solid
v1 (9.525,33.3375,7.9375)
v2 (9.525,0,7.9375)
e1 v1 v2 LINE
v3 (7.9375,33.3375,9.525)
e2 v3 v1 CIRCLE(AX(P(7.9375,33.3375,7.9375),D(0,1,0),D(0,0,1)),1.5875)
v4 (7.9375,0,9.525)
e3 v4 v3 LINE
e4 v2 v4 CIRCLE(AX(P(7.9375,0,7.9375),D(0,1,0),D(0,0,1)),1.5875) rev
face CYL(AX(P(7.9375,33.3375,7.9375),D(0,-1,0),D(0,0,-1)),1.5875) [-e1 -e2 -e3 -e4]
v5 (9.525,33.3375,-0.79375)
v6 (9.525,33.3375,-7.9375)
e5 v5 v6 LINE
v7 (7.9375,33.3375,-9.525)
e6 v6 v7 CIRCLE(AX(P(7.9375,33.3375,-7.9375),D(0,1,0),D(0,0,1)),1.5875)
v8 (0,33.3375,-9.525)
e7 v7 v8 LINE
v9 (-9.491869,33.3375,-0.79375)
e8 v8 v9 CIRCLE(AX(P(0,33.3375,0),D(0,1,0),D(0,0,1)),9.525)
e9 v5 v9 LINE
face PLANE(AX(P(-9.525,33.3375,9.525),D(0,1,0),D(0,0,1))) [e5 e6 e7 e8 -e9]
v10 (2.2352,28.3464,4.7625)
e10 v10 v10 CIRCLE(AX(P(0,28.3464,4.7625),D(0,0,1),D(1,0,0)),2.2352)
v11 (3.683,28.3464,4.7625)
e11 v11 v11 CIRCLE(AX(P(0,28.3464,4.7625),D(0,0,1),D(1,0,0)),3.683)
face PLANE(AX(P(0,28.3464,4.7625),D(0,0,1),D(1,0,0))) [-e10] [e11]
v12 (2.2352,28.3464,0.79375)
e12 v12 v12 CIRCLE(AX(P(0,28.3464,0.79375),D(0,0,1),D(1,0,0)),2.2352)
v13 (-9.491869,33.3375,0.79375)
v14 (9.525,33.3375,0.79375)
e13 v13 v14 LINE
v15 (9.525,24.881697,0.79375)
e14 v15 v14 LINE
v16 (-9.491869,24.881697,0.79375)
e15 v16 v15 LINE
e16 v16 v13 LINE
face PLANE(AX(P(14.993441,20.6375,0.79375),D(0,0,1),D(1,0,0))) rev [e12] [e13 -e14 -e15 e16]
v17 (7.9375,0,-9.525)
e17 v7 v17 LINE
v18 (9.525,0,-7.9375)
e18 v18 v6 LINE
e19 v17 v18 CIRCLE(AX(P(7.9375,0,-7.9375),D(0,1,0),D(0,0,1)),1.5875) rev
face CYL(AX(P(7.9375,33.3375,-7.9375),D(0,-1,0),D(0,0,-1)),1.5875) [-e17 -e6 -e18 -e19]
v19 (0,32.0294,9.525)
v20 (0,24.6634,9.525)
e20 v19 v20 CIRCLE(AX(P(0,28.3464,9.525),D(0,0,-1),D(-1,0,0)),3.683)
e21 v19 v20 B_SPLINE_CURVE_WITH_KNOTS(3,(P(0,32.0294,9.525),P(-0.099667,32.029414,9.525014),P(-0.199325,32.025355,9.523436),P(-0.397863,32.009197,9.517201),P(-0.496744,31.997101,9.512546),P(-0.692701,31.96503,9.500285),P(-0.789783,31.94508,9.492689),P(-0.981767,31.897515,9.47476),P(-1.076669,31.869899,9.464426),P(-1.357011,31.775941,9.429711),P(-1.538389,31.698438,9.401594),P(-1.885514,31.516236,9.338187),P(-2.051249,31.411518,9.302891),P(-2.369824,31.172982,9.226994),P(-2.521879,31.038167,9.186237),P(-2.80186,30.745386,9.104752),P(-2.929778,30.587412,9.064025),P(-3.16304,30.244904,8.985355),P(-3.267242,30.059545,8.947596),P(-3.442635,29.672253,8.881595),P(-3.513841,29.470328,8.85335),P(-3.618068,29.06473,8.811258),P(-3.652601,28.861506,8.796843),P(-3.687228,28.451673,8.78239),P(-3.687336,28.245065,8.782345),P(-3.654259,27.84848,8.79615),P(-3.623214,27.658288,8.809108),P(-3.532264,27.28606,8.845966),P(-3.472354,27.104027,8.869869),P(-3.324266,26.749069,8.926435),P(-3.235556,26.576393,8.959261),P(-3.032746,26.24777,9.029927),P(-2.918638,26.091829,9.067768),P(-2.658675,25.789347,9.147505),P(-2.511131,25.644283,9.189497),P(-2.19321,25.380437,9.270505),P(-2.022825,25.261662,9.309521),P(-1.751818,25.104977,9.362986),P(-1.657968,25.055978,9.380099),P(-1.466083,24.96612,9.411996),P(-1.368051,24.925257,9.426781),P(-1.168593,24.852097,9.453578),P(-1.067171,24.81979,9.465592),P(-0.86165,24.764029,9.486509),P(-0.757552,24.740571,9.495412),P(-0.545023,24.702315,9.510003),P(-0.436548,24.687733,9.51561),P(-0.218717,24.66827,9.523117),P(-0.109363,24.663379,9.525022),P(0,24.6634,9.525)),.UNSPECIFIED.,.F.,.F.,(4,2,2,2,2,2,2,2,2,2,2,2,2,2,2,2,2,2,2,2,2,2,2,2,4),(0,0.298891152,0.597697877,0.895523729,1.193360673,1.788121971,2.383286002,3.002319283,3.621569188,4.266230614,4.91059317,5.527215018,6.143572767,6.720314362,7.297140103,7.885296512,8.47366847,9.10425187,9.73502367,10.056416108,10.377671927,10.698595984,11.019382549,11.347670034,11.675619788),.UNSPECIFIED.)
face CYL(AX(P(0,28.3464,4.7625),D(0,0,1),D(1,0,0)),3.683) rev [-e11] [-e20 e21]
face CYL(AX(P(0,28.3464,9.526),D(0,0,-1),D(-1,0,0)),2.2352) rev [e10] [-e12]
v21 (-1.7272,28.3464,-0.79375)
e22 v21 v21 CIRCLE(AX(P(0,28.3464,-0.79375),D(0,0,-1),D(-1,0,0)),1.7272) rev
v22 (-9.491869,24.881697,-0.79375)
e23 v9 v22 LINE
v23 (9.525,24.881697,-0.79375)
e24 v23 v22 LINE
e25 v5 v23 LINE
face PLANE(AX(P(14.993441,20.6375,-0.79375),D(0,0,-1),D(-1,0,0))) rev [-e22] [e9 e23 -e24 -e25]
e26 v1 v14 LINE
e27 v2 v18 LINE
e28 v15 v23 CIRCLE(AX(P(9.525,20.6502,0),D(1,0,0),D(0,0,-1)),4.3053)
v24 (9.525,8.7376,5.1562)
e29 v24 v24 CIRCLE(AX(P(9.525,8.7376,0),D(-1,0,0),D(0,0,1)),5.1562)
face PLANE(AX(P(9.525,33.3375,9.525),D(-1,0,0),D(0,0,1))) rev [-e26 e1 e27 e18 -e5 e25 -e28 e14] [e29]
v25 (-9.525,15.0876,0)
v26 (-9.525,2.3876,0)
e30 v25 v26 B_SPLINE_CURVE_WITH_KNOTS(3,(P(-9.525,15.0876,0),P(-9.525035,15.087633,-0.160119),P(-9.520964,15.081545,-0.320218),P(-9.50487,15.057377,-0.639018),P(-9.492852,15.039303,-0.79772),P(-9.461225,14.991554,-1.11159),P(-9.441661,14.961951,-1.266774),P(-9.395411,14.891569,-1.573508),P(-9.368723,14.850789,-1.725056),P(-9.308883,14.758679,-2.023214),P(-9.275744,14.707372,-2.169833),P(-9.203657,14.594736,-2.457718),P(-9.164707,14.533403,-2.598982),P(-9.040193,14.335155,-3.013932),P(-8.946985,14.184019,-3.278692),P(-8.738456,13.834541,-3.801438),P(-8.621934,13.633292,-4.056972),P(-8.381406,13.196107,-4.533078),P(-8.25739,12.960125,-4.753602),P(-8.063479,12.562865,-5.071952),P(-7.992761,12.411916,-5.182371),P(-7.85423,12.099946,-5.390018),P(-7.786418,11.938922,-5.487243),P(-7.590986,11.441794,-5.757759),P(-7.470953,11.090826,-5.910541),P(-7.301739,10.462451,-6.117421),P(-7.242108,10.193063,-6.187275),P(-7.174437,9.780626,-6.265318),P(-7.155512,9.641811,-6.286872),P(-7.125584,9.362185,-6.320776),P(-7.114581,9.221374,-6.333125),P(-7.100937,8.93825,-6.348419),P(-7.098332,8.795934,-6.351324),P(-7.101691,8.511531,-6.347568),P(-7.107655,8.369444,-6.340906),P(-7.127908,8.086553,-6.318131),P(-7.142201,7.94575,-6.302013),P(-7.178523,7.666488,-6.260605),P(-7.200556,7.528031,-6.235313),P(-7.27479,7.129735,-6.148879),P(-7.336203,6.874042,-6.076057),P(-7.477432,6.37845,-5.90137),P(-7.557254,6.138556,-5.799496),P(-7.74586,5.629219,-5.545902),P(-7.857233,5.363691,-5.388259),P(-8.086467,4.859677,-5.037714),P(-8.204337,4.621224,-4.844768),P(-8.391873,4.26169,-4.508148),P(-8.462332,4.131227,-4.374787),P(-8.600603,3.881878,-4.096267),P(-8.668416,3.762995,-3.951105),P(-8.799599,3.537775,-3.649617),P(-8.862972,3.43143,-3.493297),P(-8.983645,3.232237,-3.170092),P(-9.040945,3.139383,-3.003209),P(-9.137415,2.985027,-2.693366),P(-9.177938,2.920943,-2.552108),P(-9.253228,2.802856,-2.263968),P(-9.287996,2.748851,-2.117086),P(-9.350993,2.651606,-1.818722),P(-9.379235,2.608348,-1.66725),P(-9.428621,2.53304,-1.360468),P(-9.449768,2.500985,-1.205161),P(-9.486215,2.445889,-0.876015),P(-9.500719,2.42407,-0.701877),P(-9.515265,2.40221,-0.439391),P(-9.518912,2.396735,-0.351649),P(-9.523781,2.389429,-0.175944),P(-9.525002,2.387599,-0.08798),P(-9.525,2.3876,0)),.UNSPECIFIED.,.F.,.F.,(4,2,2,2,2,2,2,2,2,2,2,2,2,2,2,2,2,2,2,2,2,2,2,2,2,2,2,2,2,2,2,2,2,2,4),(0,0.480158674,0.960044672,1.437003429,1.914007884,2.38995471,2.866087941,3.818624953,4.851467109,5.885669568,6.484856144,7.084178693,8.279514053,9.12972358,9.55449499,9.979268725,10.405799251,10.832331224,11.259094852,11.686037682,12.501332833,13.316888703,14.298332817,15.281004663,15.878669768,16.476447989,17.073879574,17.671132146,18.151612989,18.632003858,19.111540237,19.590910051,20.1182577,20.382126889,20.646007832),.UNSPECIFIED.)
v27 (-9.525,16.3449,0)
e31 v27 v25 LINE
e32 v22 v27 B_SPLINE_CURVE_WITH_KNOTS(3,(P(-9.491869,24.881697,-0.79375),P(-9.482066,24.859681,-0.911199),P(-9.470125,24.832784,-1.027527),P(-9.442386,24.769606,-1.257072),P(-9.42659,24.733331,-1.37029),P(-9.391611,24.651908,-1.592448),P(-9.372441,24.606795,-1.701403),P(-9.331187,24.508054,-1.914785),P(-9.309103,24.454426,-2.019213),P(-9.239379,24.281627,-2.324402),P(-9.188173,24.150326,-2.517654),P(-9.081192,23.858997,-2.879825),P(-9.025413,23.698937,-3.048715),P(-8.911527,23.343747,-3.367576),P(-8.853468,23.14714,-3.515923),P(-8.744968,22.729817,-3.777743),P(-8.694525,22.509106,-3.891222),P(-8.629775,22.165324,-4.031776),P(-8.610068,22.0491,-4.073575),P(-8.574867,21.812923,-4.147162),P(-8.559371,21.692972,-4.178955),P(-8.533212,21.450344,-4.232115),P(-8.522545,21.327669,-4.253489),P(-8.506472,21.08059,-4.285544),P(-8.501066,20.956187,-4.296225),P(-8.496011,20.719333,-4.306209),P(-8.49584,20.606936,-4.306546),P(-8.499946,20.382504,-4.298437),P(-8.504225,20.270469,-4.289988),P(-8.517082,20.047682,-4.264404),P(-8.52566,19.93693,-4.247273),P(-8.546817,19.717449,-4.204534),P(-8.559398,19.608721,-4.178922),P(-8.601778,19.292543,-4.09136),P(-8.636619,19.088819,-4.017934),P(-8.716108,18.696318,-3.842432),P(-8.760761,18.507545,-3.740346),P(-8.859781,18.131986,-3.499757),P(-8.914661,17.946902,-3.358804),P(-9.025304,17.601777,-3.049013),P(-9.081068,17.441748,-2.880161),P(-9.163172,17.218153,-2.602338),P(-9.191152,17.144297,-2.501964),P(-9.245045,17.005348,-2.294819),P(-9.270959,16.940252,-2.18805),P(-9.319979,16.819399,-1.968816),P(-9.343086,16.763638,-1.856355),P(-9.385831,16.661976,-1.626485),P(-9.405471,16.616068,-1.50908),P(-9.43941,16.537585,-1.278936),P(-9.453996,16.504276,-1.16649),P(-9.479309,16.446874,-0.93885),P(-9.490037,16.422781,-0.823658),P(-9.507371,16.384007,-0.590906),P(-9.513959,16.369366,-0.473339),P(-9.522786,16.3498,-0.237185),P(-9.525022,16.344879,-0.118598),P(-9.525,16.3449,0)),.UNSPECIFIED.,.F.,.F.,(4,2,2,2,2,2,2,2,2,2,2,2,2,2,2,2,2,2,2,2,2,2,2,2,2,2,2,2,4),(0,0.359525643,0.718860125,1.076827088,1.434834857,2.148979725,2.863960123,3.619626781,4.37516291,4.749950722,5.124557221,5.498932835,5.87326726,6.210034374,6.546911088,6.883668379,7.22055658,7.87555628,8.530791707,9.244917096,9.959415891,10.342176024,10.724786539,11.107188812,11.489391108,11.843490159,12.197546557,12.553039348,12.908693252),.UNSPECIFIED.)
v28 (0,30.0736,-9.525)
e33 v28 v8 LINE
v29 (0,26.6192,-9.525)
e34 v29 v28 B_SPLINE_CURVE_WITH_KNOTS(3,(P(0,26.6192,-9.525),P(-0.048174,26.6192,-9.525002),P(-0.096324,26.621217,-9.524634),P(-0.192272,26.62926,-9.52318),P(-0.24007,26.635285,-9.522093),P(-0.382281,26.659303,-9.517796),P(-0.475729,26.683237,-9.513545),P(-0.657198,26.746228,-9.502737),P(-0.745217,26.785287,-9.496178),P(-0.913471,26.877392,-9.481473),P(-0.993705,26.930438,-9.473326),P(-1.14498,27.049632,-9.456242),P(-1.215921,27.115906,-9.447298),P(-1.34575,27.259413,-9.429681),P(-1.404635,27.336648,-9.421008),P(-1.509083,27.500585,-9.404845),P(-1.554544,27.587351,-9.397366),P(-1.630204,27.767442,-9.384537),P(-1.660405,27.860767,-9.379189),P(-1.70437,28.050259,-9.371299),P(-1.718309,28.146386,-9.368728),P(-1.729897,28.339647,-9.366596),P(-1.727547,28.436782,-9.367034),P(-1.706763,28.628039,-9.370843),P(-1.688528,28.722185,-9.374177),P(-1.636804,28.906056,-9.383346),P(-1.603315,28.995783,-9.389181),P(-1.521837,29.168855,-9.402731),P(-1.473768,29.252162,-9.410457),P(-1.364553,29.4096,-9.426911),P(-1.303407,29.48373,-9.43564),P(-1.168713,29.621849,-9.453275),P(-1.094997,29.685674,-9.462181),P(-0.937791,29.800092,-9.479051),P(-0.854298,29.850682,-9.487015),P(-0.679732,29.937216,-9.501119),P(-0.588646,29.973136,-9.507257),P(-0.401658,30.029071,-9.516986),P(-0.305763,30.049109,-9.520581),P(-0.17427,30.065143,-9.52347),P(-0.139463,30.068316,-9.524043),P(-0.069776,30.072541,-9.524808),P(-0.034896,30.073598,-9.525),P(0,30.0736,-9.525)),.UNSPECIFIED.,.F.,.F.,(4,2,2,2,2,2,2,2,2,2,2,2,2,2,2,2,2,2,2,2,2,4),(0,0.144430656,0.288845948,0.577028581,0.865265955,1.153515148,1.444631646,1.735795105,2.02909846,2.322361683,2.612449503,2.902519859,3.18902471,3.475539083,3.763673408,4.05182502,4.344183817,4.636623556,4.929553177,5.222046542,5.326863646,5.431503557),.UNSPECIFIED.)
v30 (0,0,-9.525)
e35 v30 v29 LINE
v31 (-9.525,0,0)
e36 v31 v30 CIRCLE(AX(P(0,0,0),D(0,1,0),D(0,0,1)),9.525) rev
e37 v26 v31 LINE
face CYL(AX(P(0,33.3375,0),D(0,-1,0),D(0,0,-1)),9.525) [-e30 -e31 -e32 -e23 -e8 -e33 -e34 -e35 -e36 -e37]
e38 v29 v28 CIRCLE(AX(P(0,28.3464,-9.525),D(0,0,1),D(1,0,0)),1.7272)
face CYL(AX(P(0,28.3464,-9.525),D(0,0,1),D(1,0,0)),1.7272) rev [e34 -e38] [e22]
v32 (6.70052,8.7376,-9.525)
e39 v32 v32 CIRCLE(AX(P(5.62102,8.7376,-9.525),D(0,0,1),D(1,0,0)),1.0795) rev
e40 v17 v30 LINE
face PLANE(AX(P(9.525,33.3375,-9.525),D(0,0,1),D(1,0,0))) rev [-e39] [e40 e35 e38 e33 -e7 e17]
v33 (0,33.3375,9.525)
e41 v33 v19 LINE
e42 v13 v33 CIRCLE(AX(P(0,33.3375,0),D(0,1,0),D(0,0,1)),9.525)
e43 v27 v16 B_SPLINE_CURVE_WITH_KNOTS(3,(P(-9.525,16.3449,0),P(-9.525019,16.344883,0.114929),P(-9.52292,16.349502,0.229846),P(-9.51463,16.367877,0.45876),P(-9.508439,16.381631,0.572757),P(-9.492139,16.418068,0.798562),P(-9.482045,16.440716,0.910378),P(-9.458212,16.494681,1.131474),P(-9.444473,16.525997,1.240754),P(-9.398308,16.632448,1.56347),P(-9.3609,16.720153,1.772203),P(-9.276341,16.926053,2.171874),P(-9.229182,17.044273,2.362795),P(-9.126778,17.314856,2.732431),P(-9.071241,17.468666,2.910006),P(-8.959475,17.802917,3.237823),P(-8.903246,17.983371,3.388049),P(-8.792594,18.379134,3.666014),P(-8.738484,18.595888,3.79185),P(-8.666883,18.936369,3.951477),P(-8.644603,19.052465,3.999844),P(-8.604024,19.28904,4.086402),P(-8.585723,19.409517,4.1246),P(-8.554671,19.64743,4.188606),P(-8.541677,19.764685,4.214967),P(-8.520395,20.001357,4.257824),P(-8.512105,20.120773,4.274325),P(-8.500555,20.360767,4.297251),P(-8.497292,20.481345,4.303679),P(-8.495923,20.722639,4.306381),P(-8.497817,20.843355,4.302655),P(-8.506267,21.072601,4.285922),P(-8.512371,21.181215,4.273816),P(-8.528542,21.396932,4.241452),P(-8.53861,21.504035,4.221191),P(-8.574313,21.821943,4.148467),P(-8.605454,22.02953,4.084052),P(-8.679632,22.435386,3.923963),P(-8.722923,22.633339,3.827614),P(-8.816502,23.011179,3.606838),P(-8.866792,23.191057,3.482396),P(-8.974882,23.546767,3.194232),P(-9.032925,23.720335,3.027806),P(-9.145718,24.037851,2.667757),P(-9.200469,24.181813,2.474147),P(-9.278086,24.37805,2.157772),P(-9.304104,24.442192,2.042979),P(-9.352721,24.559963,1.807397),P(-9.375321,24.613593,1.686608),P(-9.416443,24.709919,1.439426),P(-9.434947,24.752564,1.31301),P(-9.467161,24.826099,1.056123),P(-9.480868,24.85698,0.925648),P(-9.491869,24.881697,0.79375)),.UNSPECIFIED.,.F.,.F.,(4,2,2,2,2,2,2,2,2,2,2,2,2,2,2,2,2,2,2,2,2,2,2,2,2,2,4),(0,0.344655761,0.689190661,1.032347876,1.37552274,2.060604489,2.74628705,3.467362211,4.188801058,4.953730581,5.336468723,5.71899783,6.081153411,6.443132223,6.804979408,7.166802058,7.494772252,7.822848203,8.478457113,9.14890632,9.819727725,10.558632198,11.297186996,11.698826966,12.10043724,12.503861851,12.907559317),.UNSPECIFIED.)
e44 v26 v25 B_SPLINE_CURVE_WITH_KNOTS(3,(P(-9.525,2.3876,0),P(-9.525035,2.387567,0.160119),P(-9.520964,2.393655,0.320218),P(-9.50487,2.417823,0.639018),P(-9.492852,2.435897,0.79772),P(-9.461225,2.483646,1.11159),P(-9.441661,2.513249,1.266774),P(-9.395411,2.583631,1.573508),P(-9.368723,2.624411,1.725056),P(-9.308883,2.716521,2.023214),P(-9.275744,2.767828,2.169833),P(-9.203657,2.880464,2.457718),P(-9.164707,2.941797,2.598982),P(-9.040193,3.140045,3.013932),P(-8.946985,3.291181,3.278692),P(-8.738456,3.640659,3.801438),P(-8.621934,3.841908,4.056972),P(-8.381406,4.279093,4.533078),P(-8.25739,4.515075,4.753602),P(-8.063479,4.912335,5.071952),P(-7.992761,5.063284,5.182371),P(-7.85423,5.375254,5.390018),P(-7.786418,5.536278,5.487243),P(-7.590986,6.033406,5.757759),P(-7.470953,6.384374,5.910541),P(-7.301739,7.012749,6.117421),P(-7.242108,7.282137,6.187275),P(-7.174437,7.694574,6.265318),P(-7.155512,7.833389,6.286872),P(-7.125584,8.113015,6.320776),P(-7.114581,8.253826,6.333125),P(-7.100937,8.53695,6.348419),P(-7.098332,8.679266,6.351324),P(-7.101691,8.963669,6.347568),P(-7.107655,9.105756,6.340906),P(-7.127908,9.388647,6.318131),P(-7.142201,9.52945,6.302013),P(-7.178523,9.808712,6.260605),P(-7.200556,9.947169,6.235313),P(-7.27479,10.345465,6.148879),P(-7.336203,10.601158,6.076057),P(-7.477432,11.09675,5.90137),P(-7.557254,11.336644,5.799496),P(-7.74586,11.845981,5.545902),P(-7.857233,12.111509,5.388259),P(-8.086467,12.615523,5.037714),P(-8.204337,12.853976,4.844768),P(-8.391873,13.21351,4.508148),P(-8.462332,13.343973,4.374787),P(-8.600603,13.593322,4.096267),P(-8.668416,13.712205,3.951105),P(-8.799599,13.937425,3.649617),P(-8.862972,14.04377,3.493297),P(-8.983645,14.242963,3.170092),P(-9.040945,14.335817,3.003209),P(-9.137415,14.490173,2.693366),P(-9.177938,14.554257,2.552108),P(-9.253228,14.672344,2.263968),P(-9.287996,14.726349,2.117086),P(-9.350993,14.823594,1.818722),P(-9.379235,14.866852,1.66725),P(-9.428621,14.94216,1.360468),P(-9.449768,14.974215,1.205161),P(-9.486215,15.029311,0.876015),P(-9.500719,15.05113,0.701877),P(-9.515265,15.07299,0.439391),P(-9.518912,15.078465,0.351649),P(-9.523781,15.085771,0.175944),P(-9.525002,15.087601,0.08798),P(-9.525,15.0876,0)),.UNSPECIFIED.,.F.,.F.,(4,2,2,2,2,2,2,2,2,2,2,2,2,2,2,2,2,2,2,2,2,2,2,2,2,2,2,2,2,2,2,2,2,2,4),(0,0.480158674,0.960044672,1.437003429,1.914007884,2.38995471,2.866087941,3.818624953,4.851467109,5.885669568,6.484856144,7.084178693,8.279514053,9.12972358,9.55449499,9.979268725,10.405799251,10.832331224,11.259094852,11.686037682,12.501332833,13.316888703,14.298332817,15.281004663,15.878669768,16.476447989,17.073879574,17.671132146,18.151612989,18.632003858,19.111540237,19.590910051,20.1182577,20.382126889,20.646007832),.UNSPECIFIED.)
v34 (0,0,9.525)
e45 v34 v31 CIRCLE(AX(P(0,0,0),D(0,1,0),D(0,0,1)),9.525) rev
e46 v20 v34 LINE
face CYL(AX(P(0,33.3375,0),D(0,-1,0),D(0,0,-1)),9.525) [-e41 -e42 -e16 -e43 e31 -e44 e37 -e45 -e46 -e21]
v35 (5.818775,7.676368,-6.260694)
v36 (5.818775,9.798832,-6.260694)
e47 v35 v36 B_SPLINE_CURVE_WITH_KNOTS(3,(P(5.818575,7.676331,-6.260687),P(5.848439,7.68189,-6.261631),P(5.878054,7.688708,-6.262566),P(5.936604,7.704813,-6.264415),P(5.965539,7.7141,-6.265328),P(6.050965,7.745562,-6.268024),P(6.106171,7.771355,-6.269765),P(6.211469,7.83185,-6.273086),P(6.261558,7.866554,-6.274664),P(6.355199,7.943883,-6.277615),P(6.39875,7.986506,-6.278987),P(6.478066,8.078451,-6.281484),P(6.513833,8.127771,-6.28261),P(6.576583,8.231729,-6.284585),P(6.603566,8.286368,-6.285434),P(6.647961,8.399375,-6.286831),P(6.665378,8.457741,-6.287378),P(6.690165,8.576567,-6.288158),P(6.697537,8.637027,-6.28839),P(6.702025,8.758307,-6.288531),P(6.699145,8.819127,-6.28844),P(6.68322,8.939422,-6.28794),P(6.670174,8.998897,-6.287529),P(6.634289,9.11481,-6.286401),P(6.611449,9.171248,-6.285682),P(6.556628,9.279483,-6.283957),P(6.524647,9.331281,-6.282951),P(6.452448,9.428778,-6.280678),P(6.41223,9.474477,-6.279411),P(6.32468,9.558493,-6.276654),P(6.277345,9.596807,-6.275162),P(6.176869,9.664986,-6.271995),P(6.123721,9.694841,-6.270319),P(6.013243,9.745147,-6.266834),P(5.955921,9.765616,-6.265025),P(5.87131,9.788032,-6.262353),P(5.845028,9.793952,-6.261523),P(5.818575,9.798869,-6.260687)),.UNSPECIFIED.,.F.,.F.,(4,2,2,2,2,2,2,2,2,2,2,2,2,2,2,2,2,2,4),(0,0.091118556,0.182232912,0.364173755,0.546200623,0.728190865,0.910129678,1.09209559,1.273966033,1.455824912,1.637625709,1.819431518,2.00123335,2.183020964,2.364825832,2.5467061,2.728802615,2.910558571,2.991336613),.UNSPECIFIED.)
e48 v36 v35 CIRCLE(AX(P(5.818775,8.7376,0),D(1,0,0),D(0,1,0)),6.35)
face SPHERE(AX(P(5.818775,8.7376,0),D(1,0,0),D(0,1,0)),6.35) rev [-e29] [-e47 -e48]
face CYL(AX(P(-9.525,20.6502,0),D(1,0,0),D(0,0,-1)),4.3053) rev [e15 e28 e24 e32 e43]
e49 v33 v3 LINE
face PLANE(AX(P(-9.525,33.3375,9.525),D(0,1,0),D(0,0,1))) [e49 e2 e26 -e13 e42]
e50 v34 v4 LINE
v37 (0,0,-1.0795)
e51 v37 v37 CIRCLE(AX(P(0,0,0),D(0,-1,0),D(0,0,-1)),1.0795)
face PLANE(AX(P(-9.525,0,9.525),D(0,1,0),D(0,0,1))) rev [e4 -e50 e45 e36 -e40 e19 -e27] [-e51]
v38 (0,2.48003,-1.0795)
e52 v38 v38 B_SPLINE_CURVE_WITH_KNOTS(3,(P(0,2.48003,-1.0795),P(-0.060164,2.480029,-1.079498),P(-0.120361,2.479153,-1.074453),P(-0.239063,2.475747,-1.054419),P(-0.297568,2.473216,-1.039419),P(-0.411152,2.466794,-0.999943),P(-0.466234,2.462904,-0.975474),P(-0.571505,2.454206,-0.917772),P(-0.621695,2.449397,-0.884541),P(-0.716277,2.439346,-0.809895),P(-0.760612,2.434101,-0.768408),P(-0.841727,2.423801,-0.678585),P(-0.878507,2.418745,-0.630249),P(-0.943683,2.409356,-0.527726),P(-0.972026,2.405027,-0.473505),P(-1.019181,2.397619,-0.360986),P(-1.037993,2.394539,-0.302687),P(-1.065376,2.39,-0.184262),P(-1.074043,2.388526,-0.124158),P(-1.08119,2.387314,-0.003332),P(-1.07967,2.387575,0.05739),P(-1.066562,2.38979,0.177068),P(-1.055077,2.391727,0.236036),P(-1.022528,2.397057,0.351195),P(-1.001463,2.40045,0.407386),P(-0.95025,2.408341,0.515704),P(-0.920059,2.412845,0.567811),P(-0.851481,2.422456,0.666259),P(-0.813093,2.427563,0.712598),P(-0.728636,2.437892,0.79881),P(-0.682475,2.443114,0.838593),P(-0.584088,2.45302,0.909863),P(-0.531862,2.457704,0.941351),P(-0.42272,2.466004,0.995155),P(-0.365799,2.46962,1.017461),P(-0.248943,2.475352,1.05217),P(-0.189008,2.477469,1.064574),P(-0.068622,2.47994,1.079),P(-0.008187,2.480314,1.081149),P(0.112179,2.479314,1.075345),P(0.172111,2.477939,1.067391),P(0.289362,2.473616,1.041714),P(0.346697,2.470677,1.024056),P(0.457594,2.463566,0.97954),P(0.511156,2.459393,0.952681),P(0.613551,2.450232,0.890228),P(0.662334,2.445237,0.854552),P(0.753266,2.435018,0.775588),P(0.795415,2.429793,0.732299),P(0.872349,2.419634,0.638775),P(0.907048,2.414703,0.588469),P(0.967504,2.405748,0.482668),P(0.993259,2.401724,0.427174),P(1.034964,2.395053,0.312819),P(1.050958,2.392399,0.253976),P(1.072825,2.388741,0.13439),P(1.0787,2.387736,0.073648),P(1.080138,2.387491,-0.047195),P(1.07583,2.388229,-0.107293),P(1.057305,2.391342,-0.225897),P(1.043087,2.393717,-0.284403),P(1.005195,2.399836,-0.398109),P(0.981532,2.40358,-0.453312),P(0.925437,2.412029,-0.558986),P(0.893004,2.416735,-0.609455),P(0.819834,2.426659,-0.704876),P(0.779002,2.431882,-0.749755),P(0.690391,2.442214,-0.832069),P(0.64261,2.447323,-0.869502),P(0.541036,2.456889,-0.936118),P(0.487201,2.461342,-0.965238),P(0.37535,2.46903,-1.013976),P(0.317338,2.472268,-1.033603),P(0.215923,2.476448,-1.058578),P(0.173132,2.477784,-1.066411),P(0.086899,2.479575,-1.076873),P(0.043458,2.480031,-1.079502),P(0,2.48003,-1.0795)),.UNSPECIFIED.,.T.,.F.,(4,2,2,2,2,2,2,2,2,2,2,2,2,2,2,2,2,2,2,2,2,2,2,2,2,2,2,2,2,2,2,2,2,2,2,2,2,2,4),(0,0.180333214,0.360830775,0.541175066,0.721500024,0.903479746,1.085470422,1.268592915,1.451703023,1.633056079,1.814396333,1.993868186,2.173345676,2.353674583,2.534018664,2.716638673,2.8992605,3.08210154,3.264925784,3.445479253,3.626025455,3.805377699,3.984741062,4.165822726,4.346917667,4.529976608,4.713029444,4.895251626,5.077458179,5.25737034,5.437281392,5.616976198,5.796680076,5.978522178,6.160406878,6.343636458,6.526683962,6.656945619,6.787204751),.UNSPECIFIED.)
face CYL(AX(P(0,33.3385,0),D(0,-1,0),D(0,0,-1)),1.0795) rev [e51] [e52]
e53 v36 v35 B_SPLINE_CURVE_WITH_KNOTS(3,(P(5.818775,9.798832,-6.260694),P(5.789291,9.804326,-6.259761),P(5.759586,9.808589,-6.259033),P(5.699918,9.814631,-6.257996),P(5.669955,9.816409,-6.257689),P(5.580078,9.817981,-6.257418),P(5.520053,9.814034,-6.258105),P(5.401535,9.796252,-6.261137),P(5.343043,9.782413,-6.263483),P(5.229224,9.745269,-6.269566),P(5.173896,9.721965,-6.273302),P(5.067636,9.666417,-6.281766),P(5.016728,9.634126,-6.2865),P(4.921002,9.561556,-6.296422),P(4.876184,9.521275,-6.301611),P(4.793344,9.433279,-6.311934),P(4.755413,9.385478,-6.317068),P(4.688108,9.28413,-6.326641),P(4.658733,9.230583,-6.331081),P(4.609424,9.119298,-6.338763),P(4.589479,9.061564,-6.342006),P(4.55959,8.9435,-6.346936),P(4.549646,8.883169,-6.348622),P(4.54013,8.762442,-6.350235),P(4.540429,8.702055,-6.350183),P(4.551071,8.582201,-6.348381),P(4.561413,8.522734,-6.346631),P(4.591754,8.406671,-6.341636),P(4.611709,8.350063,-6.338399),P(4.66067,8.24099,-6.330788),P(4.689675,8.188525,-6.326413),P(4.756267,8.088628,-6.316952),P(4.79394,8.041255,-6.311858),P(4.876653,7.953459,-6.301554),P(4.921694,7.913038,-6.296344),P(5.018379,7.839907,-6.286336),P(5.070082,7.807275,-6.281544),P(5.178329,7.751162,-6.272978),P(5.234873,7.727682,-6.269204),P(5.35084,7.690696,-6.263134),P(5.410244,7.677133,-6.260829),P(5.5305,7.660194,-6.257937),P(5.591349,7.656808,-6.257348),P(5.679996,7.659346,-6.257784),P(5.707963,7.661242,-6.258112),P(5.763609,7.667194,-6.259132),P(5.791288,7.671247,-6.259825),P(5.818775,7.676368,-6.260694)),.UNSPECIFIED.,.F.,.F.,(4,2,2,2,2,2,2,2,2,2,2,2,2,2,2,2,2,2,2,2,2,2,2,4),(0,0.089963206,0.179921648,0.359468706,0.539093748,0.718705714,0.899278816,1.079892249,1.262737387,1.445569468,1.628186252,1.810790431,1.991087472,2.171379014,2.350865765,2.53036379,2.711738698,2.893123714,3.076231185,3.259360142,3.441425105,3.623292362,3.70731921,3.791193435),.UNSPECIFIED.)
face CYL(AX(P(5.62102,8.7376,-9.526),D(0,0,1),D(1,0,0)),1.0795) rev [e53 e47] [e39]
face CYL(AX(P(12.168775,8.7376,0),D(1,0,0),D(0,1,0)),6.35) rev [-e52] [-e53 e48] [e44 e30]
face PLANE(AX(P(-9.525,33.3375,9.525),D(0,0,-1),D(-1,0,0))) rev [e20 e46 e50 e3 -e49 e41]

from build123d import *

# Parameters (mm, degrees)
SKETCH1_W               = 19.05
SKETCH1_H               = 19.05
EXTRUDE1_DEPTH          = 33.3375
CUT_EXTRUDE1_DEPTH      = 36.956086498
CUT_EXTRUDE1_DEPTH_BACK = 36.956086498
SKETCH2_R               = 1.7272
FILLET1_START           = 4.7625
FILLET1_OUTLINE_R       = 3.683
FILLET1_OUTLINE_R_2     = 1.7272
FILLET1_DEPTH           = 6.2375
FILLET1_START_2         = -0.79375
FILLET1_2_OUTLINE_R     = 3.683
FILLET1_2_OUTLINE_R_2   = 1.7272
FILLET1_2_DEPTH         = 1.5875
FILLET1_START_3         = 0.79375
FILLET1_3_OUTLINE_R     = 2.2352
FILLET1_3_OUTLINE_R_2   = 1.7272
FILLET1_3_DEPTH         = 3.96875
FILLET1_START_4         = -11
FILLET1_4_OUTLINE_R     = 1.0795
FILLET1_4_DEPTH         = 6.6947
FILLET1_START_5         = -9.525
FILLET1_5_DEPTH         = 19.05
FILLET1_START_6         = 16.48139325
FILLET1_6_OUTLINE_W     = 19.05
FILLET1_6_OUTLINE_H     = 1.5875
FILLET1_6_DEPTH         = 16.85610675
FILLET1_7_DEPTH         = 29.81639325
FILLET1_8_OUTLINE_R     = 1.0795
FILLET1_8_DEPTH         = 2.480030305
SPLIT1_DEPTH            = 33.3375


with BuildPart() as part:
    # Sketch1 → Extrude1 (new body)
    with BuildSketch(Plane(origin=(0, 0, 0), x_dir=(1, 0, 0), z_dir=(0, 1, 0))):
        Rectangle(SKETCH1_W, SKETCH1_H)
    extrude(amount=EXTRUDE1_DEPTH)

    # Sketch2 → Cut-Extrude1 (cut, two sides: drawn at the far end of the back side and taken through both)
    with BuildSketch(Plane.XY.offset(-CUT_EXTRUDE1_DEPTH_BACK)):
        with Locations((0, 28.3464)):
            Circle(SKETCH2_R)
    extrude(amount=CUT_EXTRUDE1_DEPTH + CUT_EXTRUDE1_DEPTH_BACK, mode=Mode.SUBTRACT)


with BuildPart() as body_2:
    # Sketch3 → Revolve1 (revolve)
    with BuildSketch(Plane.XY):
        with BuildLine():
            Line((12.168775296, 8.7376), (-12.7, 8.7376))
            Line((-12.7, 8.7376), (-12.7, 15.0876))
            Line((-12.7, 15.0876), (5.818775296, 15.0876))
            ThreePointArc((5.818775296, 15.0876), (10.308903356, 13.227728061), (12.168775296, 8.7376))
        make_face()
    revolve(axis=Axis((12.168775296, 8.7376, 0), (-1, 0, 0)))


with BuildPart() as part_1:
    add(part.part)

    # Combine1: cut body 2
    add(body_2.part, mode=Mode.SUBTRACT)

    # Fillet1: read off the stored shape, not the designer's step
    # Fillet1 outline → Fillet1 (cut)
    with BuildSketch(Plane.XY.offset(FILLET1_START)):
        with Locations((0, 28.3464)):
            Circle(FILLET1_OUTLINE_R)
        with Locations((0, 28.3464)):
            Circle(FILLET1_OUTLINE_R_2, mode=Mode.SUBTRACT)
    extrude(amount=FILLET1_DEPTH, mode=Mode.SUBTRACT)

    # Fillet1 2 outline → Fillet1 2 (cut)
    with BuildSketch(Plane.XY.offset(FILLET1_START_2)):
        with Locations((0, 28.3464)):
            Circle(FILLET1_2_OUTLINE_R)
        with Locations((0, 28.3464)):
            Circle(FILLET1_2_OUTLINE_R_2, mode=Mode.SUBTRACT)
    extrude(amount=FILLET1_2_DEPTH, mode=Mode.SUBTRACT)

    # Fillet1 3 outline → Fillet1 3 (cut)
    with BuildSketch(Plane.XY.offset(FILLET1_START_3)):
        with Locations((0, 28.3464)):
            Circle(FILLET1_3_OUTLINE_R)
        with Locations((0, 28.3464)):
            Circle(FILLET1_3_OUTLINE_R_2, mode=Mode.SUBTRACT)
    extrude(amount=FILLET1_3_DEPTH, mode=Mode.SUBTRACT)

    # Fillet1 4 outline → Fillet1 4 (cut)
    with BuildSketch(Plane.XY.offset(FILLET1_START_4)):
        with Locations((5.62102, 8.7376)):
            Circle(FILLET1_4_OUTLINE_R)
    extrude(amount=FILLET1_4_DEPTH, mode=Mode.SUBTRACT)

    # Fillet1 5 outline → Fillet1 5 (cut)
    with BuildSketch(Plane.YZ.offset(FILLET1_START_5)):
        with BuildLine():
            Line((33.3375, 0.79375), (24.881697256, 0.79375))
            ThreePointArc((24.881697256, 0.79375), (16.3449, 0), (24.881697256, -0.79375))
            Line((24.881697256, -0.79375), (33.3375, -0.79375))
            Line((33.3375, -0.79375), (33.3375, 0.79375))
        make_face()
    extrude(amount=FILLET1_5_DEPTH, mode=Mode.SUBTRACT)

    # Fillet1 6 outline → Fillet1 6 (cut)
    with BuildSketch(Plane(origin=(0, 0, 0), x_dir=(1, 0, 0), z_dir=(0, 1, 0)).offset(FILLET1_START_6)):
        Rectangle(FILLET1_6_OUTLINE_W, FILLET1_6_OUTLINE_H)
        with BuildLine():
            ThreePointArc((7.9375, 9.525), (9.060032015, 9.060032015), (9.525, 7.9375))
            Line((9.525, 7.9375), (9.525, 9.525))
            Line((9.525, 9.525), (7.9375, 9.525))
        make_face()
        with BuildLine():
            Line((9.525, -9.525), (9.525, -7.9375))
            ThreePointArc((9.525, -7.9375), (9.060032015, -9.060032015), (7.9375, -9.525))
            Line((7.9375, -9.525), (9.525, -9.525))
        make_face()
    extrude(amount=FILLET1_6_DEPTH, mode=Mode.SUBTRACT)

    # Fillet1 7 outline → Fillet1 7 (cut)
    with BuildSketch(Plane(origin=(0, 0, 0), x_dir=(1, 0, 0), z_dir=(0, 1, 0))):
        with BuildLine():
            ThreePointArc((7.9375, 9.525), (9.060032015, 9.060032015), (9.525, 7.9375))
            Line((9.525, 7.9375), (9.525, 9.525))
            Line((9.525, 9.525), (7.9375, 9.525))
        make_face()
        with BuildLine():
            Line((9.525, -9.525), (9.525, -7.9375))
            ThreePointArc((9.525, -7.9375), (9.060032015, -9.060032015), (7.9375, -9.525))
            Line((7.9375, -9.525), (9.525, -9.525))
        make_face()
    extrude(amount=FILLET1_7_DEPTH, mode=Mode.SUBTRACT)

    # Fillet1 8 outline → Fillet1 8 (cut)
    with BuildSketch(Plane(origin=(0, 0, 0), x_dir=(1, 0, 0), z_dir=(0, 1, 0))):
        Circle(FILLET1_8_OUTLINE_R)
    extrude(amount=FILLET1_8_DEPTH, mode=Mode.SUBTRACT)

    # Split1: read off the stored shape, not the designer's step
    # Split1 outline → Split1 (cut)
    with BuildSketch(Plane(origin=(0, 0, 0), x_dir=(1, 0, 0), z_dir=(0, 1, 0))):
        with BuildLine():
            Line((-9.525, 9.525), (-9.525, 0))
            ThreePointArc((-9.525, 0), (-6.735192091, 6.735192091), (0, 9.525))
            Line((0, 9.525), (-9.525, 9.525))
        make_face()
        with BuildLine():
            ThreePointArc((0, -9.525), (-6.735192091, -6.735192091), (-9.525, 0))
            Line((-9.525, 0), (-9.525, -9.525))
            Line((-9.525, -9.525), (0, -9.525))
        make_face()
    extrude(amount=SPLIT1_DEPTH, mode=Mode.SUBTRACT)


solid = part_1.part
